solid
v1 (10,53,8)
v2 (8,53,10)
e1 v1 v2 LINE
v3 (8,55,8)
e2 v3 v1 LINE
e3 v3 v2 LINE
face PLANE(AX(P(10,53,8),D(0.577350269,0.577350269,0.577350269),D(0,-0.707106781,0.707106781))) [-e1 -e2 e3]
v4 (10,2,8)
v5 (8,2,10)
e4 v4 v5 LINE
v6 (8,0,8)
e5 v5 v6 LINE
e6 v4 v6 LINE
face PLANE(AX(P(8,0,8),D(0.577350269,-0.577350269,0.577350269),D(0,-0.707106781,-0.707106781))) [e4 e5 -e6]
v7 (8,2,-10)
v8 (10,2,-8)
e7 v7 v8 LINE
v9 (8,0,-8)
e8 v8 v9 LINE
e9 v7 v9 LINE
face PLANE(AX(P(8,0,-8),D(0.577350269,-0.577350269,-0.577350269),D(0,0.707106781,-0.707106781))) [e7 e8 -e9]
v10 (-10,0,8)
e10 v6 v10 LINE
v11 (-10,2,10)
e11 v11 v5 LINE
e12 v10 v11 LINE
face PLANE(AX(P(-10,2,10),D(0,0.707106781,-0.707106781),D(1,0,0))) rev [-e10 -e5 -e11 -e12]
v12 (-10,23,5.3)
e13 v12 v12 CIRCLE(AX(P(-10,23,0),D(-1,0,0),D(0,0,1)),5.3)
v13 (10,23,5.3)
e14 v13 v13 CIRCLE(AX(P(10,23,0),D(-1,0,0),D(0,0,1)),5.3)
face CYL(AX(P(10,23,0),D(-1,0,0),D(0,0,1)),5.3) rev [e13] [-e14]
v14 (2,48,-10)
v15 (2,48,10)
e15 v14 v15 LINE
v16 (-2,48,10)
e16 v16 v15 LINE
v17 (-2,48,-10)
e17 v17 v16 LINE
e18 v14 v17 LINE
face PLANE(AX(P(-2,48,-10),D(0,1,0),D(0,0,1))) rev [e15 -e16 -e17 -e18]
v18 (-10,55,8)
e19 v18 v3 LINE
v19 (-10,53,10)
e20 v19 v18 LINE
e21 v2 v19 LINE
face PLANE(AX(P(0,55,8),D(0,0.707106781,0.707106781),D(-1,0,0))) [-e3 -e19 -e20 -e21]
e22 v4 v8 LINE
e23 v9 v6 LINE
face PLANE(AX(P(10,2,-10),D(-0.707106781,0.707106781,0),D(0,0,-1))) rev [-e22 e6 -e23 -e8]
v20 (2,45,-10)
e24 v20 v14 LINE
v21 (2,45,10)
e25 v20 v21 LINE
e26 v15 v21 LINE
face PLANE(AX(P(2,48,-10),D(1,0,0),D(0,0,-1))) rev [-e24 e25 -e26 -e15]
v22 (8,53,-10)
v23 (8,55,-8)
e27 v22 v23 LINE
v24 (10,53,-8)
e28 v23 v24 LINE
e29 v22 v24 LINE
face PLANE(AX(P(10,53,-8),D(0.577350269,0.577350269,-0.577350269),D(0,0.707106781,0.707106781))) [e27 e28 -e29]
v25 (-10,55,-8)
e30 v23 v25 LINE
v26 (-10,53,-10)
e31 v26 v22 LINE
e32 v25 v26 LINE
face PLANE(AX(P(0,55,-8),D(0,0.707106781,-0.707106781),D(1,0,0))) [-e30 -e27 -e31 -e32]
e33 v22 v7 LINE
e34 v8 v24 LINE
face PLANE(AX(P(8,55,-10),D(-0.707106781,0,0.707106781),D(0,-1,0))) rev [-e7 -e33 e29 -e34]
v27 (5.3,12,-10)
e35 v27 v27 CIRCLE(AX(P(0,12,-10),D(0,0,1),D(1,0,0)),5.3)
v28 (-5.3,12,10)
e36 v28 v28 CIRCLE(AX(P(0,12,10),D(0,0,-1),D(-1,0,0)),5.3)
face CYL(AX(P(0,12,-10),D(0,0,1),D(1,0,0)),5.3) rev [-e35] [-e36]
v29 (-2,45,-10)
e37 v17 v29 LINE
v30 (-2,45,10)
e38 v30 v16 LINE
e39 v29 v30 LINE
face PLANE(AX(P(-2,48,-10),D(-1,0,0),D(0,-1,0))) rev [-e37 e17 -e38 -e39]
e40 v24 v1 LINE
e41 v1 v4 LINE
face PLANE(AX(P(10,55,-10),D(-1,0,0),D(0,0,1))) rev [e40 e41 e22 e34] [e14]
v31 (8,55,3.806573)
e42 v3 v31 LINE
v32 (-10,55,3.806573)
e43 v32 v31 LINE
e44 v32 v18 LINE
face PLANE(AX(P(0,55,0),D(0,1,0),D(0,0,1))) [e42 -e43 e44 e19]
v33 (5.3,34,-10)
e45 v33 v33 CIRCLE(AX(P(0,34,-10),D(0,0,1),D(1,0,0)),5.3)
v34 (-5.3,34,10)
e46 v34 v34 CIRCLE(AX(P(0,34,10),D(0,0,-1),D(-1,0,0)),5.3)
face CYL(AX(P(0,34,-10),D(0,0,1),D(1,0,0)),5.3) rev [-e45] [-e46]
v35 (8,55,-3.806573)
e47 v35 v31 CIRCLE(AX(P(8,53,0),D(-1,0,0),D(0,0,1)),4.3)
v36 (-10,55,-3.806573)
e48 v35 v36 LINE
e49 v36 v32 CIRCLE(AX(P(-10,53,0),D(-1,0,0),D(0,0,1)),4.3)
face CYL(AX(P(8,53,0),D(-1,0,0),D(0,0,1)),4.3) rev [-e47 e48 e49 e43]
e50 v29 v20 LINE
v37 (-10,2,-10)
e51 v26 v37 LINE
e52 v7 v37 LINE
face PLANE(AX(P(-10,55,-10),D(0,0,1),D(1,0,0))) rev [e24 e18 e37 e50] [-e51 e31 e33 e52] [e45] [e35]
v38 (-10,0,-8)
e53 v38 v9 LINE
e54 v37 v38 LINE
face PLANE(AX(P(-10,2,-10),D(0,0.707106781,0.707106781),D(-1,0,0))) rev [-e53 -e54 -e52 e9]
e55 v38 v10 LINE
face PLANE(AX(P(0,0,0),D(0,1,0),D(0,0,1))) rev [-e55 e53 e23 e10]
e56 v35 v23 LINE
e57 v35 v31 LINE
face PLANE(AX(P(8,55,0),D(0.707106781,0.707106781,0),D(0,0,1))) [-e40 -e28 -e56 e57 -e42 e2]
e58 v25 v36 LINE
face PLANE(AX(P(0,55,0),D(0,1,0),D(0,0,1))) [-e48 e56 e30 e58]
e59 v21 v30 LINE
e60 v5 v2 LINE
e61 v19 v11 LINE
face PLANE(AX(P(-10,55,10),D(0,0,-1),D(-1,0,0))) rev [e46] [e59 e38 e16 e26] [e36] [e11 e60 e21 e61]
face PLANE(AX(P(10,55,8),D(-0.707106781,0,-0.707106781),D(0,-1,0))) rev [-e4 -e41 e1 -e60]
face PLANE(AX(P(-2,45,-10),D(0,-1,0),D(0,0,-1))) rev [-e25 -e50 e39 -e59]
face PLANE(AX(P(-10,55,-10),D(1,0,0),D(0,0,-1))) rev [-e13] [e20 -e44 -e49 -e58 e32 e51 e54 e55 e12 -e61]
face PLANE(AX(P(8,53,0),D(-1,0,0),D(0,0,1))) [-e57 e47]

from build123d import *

# Parameters (mm, degrees)
SKETCH1_W               = 20
SKETCH1_H               = 20
BOSS_EXTRUDE1_DEPTH     = 55
CUT_EXTRUDE1_DEPTH      = 60.371710435
CUT_EXTRUDE1_DEPTH_BACK = 60.371710435
SKETCH2_R               = 5.3
SKETCH2_W               = 4
SKETCH2_H               = 3
SKETCH3_R               = 5.3
CUT_EXTRUDE2_DEPTH      = 60.371710435
SKETCH4_R               = 4.3
CUT_EXTRUDE3_DEPTH      = 18
CHAMFER1_SIZE           = 2


with BuildPart() as part:
    # Sketch1 → Boss-Extrude1 (new body)
    with BuildSketch(Plane(origin=(0, 0, 0), x_dir=(1, 0, 0), z_dir=(0, 1, 0))):
        Rectangle(SKETCH1_W, SKETCH1_H)
    extrude(amount=BOSS_EXTRUDE1_DEPTH)

    # Sketch2 → Cut-Extrude1 (cut, two sides: drawn at the far end of the back side and taken through both)
    with BuildSketch(Plane.XY.offset(10).offset(-CUT_EXTRUDE1_DEPTH_BACK)):
        with Locations((0, 12)):
            Circle(SKETCH2_R)
        with Locations((0, 34)):
            Circle(SKETCH2_R)
        with Locations((0, 46.5)):
            Rectangle(SKETCH2_W, SKETCH2_H)
    extrude(amount=CUT_EXTRUDE1_DEPTH + CUT_EXTRUDE1_DEPTH_BACK, mode=Mode.SUBTRACT)

    # Sketch3 → Cut-Extrude2 (cut, through all)
    with BuildSketch(Plane.ZY.offset(10)):
        with Locations((0, 23)):
            Circle(SKETCH3_R)
    extrude(amount=-CUT_EXTRUDE2_DEPTH, mode=Mode.SUBTRACT)

    # Sketch4 → Cut-Extrude3 (cut)
    with BuildSketch(Plane.ZY.offset(10)):
        with Locations((0, 53)):
            Circle(SKETCH4_R)
    extrude(amount=-CUT_EXTRUDE3_DEPTH, mode=Mode.SUBTRACT)

    # Chamfer1
    chamfer1_edges = [part.edges().sort_by_distance(p)[0] for p in [
        (10, 55, 0),
        (0, 55, -10),
        (0, 0, -10),
        (10, 0, 0),
        (0, 0, 10),
        (0, 55, 10),
        (10, 27.5, -10),
        (10, 27.5, 10),
    ]]
    chamfer(chamfer1_edges, length=CHAMFER1_SIZE - 0.0001)  # a hair under: the kernel refuses the full size


solid = part.part
